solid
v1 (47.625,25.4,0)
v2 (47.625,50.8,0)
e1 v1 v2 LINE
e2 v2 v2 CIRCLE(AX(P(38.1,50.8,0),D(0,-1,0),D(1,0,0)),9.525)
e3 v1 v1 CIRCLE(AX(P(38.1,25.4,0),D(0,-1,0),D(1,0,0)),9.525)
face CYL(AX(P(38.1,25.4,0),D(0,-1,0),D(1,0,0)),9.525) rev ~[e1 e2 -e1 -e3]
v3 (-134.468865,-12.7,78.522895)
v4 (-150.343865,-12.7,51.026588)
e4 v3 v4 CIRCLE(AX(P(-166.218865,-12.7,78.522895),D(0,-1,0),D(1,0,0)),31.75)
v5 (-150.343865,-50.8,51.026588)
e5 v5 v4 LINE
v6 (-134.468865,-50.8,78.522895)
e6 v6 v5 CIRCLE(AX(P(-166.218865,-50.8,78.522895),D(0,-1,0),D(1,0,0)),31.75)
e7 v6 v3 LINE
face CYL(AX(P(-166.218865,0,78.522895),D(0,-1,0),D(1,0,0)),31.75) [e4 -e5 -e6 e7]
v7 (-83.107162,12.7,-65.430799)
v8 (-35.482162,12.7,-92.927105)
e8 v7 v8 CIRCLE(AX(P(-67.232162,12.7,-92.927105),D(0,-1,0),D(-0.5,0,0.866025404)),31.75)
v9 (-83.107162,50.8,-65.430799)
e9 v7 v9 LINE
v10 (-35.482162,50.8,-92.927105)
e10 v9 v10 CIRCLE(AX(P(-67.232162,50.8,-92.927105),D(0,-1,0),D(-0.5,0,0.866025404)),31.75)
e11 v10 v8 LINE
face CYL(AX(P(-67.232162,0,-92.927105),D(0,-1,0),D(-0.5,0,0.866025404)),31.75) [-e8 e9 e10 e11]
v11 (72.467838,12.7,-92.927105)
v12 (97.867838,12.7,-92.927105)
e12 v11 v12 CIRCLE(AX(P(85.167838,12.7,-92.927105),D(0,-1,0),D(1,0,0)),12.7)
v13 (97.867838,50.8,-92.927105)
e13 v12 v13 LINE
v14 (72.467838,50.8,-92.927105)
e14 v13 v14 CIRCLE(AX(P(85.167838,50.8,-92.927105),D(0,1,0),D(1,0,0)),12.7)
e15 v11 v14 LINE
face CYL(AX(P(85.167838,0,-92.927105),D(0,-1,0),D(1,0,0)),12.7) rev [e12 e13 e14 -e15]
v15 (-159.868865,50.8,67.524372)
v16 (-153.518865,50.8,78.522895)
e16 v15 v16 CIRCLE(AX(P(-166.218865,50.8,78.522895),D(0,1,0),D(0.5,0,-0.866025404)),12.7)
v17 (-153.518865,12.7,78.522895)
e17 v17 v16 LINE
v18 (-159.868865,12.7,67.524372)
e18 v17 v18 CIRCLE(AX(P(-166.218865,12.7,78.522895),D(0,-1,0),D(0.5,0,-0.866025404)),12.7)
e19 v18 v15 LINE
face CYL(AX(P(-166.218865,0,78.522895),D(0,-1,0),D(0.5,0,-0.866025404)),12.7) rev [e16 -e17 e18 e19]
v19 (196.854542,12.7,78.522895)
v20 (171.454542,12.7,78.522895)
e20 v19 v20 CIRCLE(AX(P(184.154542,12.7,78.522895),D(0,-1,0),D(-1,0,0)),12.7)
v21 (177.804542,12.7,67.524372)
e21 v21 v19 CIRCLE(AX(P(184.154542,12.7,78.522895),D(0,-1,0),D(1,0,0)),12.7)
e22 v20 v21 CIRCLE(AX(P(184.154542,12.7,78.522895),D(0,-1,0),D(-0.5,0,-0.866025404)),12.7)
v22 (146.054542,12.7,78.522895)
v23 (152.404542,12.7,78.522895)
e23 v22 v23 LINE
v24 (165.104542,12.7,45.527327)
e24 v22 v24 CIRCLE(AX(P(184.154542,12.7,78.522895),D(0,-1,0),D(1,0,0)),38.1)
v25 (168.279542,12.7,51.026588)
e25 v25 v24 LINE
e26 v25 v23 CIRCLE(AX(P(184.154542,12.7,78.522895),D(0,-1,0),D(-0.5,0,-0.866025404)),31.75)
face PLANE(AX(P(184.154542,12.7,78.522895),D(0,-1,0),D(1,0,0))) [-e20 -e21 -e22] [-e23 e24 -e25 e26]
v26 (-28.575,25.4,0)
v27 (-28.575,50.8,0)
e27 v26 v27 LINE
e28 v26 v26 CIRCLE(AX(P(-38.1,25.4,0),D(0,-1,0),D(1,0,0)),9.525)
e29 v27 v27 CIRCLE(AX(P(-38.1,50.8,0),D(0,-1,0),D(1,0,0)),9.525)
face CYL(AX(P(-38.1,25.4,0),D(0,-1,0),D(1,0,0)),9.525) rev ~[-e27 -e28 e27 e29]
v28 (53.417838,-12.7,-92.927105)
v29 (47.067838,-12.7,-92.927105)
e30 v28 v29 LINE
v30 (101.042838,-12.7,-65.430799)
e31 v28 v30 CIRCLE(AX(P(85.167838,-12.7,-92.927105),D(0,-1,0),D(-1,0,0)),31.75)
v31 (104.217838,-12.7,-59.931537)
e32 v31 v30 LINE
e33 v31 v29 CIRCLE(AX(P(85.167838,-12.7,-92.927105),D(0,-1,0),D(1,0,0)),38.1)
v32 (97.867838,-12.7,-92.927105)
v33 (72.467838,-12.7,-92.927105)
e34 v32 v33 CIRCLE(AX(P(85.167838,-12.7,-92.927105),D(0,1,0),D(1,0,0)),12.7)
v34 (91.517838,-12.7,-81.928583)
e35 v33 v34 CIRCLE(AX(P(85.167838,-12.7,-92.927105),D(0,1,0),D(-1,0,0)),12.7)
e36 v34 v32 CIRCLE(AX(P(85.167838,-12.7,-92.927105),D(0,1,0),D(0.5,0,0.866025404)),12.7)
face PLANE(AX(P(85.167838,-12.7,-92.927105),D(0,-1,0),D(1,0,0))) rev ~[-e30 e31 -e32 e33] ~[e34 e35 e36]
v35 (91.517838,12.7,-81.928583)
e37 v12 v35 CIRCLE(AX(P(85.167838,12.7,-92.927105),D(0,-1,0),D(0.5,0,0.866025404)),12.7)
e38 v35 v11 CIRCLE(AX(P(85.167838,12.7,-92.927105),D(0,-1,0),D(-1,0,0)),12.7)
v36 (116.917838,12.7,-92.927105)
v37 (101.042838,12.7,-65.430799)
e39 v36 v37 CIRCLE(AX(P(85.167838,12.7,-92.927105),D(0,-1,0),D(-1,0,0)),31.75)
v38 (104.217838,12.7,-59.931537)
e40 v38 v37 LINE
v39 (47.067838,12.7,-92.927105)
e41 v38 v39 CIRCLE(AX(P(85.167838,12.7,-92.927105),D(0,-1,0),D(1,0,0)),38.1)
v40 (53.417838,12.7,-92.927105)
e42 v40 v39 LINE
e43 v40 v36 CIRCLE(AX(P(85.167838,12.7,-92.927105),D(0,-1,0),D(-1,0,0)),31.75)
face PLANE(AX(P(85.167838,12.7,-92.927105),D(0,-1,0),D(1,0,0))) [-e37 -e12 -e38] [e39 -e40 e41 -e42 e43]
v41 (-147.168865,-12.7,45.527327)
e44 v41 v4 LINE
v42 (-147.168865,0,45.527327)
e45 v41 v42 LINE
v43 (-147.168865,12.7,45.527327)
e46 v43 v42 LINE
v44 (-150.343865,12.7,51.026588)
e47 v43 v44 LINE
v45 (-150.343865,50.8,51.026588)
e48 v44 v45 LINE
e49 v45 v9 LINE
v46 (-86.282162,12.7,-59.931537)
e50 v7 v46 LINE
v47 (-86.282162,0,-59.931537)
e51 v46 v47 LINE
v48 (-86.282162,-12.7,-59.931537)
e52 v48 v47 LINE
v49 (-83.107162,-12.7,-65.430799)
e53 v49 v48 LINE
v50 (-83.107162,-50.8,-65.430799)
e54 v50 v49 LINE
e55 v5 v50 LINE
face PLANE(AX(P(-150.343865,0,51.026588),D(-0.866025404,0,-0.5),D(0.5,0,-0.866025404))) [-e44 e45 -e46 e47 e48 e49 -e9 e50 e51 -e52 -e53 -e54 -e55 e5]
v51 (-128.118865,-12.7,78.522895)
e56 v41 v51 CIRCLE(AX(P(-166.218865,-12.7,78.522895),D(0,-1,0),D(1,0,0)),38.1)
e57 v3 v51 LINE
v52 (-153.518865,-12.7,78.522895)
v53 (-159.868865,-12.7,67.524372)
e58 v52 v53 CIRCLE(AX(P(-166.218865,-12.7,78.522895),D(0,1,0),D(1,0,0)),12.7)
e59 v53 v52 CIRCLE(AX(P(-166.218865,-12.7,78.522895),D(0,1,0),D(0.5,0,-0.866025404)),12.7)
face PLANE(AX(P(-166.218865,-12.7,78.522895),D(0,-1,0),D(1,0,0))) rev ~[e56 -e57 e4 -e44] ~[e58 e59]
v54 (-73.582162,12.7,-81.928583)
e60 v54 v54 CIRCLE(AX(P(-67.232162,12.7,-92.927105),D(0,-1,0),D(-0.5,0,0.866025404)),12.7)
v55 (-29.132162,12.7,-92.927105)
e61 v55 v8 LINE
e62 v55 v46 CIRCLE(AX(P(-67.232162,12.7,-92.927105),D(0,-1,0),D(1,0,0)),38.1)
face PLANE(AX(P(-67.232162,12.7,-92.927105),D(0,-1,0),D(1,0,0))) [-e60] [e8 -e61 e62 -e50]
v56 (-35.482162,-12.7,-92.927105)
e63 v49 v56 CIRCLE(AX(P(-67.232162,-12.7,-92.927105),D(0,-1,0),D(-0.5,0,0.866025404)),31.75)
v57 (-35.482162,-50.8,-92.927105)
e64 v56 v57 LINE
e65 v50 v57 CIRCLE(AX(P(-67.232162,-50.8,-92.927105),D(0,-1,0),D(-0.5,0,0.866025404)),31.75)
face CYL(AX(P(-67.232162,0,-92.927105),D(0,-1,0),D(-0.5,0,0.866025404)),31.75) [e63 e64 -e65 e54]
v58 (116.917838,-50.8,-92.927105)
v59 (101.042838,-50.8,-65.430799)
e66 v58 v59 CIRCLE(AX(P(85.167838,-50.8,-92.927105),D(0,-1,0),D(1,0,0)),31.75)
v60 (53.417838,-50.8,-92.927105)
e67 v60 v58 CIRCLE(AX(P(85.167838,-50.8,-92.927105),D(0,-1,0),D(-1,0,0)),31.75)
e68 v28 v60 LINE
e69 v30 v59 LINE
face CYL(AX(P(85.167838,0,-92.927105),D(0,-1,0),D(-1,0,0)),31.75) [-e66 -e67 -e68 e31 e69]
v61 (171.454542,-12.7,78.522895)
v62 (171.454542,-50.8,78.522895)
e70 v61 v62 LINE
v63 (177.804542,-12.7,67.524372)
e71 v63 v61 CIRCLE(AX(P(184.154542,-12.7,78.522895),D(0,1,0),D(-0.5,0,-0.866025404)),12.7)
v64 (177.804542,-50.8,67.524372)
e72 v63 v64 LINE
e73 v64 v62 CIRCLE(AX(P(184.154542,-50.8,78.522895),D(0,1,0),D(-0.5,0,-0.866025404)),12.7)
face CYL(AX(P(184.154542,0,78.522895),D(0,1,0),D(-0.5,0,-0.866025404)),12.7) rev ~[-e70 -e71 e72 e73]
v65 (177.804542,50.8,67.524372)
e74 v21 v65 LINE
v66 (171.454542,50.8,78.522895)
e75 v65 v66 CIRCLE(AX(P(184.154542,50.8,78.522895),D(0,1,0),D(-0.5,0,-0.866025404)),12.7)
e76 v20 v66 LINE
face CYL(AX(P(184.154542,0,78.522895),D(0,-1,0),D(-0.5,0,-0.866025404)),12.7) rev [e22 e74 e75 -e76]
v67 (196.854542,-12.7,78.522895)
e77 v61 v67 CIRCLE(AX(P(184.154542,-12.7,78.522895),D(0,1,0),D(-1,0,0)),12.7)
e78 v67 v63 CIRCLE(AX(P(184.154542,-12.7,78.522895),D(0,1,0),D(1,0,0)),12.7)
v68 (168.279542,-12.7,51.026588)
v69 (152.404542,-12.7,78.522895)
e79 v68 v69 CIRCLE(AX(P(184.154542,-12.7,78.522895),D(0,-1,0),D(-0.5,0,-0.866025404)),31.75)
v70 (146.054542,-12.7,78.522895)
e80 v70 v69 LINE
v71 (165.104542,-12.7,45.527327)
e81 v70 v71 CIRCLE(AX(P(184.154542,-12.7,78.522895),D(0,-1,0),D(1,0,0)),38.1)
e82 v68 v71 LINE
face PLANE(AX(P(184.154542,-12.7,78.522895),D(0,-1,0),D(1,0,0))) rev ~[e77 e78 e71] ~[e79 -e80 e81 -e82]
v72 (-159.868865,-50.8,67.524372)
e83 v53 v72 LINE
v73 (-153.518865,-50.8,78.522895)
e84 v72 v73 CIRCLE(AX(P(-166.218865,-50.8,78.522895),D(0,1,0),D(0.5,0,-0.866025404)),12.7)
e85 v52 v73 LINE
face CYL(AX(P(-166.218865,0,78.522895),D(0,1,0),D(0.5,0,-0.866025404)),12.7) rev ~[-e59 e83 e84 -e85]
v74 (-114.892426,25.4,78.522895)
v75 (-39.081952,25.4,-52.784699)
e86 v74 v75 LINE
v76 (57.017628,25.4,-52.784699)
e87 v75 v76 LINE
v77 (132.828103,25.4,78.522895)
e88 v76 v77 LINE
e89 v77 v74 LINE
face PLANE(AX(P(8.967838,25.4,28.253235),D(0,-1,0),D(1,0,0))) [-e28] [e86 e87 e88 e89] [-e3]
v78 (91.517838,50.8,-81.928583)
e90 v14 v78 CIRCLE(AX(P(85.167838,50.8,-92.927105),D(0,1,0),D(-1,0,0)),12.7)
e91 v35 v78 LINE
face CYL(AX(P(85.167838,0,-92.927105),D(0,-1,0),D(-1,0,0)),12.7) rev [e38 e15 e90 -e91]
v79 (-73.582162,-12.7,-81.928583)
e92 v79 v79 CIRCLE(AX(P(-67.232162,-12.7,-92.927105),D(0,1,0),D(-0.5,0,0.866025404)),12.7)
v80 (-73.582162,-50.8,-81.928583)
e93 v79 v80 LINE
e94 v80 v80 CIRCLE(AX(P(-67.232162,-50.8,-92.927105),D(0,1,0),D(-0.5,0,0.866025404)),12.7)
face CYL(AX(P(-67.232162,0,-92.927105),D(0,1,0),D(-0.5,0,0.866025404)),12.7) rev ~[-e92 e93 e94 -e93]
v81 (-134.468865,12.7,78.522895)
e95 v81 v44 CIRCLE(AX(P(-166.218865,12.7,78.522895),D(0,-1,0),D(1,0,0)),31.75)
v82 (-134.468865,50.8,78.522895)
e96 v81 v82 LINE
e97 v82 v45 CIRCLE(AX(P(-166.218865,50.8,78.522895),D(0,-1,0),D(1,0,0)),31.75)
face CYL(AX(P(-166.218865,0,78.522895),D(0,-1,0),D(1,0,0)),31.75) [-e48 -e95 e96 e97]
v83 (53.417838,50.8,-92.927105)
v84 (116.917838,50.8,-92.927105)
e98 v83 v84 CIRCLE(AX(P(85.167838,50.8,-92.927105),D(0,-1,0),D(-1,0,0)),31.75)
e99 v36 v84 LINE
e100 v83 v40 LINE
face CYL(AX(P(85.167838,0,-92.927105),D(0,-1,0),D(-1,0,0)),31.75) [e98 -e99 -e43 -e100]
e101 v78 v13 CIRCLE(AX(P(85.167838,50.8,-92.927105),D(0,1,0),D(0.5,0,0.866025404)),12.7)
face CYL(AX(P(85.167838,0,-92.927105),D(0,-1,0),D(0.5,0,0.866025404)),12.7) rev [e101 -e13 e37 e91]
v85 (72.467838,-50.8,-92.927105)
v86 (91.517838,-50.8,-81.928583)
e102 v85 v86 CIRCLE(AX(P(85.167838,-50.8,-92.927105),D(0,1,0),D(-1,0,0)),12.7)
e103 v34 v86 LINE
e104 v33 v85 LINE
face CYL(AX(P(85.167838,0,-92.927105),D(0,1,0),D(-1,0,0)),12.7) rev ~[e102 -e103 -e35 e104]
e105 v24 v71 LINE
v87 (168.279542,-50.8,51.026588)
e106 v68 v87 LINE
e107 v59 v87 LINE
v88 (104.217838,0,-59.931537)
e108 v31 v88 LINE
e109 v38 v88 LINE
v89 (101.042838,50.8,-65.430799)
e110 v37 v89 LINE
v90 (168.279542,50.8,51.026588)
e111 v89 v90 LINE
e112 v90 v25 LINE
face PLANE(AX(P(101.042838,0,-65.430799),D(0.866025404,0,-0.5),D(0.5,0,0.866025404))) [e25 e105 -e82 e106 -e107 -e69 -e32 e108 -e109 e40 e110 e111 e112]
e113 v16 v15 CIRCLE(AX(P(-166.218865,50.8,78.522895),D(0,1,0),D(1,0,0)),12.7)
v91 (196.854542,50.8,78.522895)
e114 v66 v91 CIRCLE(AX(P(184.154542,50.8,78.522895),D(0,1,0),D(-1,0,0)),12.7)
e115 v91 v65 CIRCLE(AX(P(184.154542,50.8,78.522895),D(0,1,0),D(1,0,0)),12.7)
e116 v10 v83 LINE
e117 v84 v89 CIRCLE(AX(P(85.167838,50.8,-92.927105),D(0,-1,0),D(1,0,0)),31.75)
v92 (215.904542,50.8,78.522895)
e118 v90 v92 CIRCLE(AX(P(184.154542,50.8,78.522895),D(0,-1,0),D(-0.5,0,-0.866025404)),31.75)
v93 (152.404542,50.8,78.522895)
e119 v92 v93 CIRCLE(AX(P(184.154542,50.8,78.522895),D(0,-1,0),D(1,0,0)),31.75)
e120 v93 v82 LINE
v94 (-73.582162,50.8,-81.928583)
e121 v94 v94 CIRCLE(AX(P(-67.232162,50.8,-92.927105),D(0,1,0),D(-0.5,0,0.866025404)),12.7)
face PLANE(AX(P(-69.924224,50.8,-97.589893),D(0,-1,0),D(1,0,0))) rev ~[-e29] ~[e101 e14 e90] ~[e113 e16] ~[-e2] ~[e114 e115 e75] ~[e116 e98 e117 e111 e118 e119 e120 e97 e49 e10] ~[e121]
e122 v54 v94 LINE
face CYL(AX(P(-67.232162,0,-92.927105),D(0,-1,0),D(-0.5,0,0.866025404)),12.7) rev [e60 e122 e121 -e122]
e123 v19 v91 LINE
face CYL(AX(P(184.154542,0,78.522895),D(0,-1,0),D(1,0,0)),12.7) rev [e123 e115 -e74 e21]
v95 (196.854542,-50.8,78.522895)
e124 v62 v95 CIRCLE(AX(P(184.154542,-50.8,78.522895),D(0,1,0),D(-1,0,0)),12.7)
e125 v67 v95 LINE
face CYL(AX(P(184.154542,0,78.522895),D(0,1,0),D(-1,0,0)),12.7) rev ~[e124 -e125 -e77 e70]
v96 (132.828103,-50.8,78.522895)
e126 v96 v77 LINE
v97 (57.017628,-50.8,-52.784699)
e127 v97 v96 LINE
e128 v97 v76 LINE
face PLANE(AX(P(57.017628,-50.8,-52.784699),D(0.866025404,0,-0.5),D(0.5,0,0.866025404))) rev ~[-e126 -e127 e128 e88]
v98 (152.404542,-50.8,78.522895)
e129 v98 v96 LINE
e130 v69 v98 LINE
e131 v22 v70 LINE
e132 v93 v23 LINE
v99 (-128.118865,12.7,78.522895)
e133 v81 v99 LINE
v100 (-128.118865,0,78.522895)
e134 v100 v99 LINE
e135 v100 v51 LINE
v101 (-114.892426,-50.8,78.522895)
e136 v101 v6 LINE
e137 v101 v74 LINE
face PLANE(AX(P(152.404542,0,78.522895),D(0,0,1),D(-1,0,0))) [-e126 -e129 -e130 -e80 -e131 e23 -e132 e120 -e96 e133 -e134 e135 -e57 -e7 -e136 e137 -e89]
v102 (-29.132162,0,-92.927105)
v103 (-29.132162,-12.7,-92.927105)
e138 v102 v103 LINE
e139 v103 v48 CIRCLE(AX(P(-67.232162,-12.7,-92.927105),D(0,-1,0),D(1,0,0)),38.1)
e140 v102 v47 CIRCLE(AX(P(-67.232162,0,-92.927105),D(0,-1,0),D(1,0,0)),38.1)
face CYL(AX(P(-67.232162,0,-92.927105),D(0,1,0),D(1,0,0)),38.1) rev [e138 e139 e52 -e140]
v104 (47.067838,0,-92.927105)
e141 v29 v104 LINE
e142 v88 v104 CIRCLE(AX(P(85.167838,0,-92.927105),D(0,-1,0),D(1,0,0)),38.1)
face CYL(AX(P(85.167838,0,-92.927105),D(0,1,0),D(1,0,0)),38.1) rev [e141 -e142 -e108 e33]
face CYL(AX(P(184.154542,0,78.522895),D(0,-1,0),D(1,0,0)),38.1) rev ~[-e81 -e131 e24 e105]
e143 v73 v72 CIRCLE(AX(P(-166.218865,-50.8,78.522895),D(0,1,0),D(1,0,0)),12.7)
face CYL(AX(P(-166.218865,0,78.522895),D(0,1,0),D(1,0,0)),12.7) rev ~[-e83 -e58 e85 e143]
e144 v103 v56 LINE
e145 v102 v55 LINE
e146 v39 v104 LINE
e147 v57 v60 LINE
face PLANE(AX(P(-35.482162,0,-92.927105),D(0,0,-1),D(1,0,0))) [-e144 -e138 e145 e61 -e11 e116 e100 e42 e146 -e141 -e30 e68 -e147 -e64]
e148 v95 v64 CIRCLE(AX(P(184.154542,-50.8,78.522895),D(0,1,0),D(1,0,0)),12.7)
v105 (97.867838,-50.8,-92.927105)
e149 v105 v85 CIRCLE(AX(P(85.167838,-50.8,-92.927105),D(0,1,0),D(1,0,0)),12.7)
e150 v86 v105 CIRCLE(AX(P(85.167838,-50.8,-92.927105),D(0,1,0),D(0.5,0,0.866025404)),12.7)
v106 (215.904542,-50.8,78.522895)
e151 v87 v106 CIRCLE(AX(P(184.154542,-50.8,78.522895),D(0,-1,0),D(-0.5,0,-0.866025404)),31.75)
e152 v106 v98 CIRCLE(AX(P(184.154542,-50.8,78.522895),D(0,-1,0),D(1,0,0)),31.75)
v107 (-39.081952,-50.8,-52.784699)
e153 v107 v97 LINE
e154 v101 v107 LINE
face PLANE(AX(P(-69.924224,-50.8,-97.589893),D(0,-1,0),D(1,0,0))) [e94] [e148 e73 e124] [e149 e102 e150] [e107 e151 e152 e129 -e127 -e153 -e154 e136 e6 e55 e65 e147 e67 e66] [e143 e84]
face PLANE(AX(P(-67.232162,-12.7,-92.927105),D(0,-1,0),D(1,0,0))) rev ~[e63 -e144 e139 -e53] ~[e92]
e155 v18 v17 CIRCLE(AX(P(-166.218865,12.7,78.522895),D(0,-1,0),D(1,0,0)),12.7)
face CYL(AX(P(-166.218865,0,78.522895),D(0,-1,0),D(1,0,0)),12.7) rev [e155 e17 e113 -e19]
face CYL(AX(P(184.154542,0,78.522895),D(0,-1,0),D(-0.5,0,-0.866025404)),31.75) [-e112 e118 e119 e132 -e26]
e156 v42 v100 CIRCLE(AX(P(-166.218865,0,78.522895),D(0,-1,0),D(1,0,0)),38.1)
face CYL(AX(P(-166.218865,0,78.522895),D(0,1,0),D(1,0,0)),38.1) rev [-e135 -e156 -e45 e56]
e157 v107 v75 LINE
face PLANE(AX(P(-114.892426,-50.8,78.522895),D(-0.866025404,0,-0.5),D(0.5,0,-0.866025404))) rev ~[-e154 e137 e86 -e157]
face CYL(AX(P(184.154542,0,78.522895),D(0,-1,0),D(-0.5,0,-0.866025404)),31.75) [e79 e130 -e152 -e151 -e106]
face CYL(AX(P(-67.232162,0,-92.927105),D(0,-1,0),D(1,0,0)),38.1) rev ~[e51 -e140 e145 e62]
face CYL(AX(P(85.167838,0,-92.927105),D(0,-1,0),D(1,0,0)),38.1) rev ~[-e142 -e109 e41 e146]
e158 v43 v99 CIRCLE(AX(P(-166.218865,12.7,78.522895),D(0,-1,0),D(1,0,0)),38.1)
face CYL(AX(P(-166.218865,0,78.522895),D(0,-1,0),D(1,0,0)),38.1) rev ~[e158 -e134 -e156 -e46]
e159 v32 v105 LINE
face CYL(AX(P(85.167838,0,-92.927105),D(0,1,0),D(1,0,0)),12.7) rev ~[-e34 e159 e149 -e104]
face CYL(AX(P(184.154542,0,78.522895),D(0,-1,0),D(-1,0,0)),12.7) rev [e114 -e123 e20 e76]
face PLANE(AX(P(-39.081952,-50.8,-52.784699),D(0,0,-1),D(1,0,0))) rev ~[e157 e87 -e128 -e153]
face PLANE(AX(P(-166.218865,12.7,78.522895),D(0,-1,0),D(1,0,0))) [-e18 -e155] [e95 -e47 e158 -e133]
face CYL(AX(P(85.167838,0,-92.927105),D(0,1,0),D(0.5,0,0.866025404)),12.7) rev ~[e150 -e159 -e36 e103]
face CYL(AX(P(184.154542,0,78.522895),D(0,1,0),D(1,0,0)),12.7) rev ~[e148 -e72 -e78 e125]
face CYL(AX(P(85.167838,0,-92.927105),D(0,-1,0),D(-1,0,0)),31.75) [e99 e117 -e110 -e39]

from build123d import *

# Parameters (mm, degrees)
F1_DEPTH = 50.8
F3_DEPTH = 76.2
F4_R     = 38.1
F5_DEPTH = 12.7
F6_R     = 9.525
F7_DEPTH = 25.401


with BuildPart() as f1:
    # F0 (on Front) → F1 (new body, symmetric)
    with BuildSketch(Plane.XZ):
        with BuildLine():
            ThreePointArc((-83.1071616711, -65.430798607), (-83.1071616711, -120.4234117473), (-35.4821616711, -92.9271051772))
            Line((-35.4821616711, -92.9271051772), (-54.5321616711, -92.9271051772))
            ThreePointArc((-54.5321616711, -92.9271051772), (-73.5821616711, -103.9256278052), (-73.5821616711, -81.9285825491))
            Line((-73.5821616711, -81.9285825491), (-83.1071616711, -65.430798607))
        make_face()
        with BuildLine():
            ThreePointArc((-83.1071616711, -65.430798607), (-51.3571616711, -65.430798607), (-35.4821616711, -92.9271051772))
            Line((-35.4821616711, -92.9271051772), (53.4178383289, -92.9271051772))
            ThreePointArc((53.4178383289, -92.9271051772), (69.2928383289, -65.430798607), (101.0428383289, -65.430798607))
            Line((101.0428383289, -65.430798607), (168.2795419814, 51.0265882527))
            ThreePointArc((168.2795419814, 51.0265882527), (156.6582354113, 62.6478948228), (152.4045419814, 78.5228948228))
            Line((152.4045419814, 78.5228948228), (-134.4688653237, 78.5228948228))
            ThreePointArc((-134.4688653237, 78.5228948228), (-138.7225587535, 62.6478948228), (-150.3438653237, 51.0265882527))
            Line((-150.3438653237, 51.0265882527), (-83.1071616711, -65.430798607))
        make_face()
        with BuildLine():
            Line((-54.5321616711, -92.9271051772), (-35.4821616711, -92.9271051772))
            ThreePointArc((-35.4821616711, -92.9271051772), (-51.3571616711, -65.430798607), (-83.1071616711, -65.430798607))
            Line((-83.1071616711, -65.430798607), (-73.5821616711, -81.9285825491))
            ThreePointArc((-73.5821616711, -81.9285825491), (-60.8821616711, -81.9285825491), (-54.5321616711, -92.9271051772))
        make_face()
        with BuildLine():
            ThreePointArc((101.0428383289, -65.430798607), (69.2928383289, -65.430798607), (53.4178383289, -92.9271051772))
            Line((53.4178383289, -92.9271051772), (72.4678383289, -92.9271051772))
            ThreePointArc((72.4678383289, -92.9271051772), (78.8178383289, -81.9285825491), (91.5178383289, -81.9285825491))
            Line((91.5178383289, -81.9285825491), (101.0428383289, -65.430798607))
        make_face()
        with BuildLine():
            Line((72.4678383289, -92.9271051772), (53.4178383289, -92.9271051772))
            ThreePointArc((53.4178383289, -92.9271051772), (85.1678383289, -124.6771051772), (116.9178383289, -92.9271051772))
            ThreePointArc((116.9178383289, -92.9271051772), (112.664144899, -77.0521051772), (101.0428383289, -65.430798607))
            Line((101.0428383289, -65.430798607), (91.5178383289, -81.9285825491))
            ThreePointArc((91.5178383289, -81.9285825491), (96.1663609569, -86.5771051772), (97.8678383289, -92.9271051772))
            ThreePointArc((97.8678383289, -92.9271051772), (85.1678383289, -105.6271051772), (72.4678383289, -92.9271051772))
        make_face()
        with BuildLine():
            ThreePointArc((-134.4688653237, 78.5228948228), (-193.7151718938, 94.3978948228), (-150.3438653237, 51.0265882527))
            Line((-150.3438653237, 51.0265882527), (-159.8688653237, 67.5243721948))
            ThreePointArc((-159.8688653237, 67.5243721948), (-177.2173879518, 84.8728948228), (-153.5188653237, 78.5228948228))
            Line((-153.5188653237, 78.5228948228), (-134.4688653237, 78.5228948228))
        make_face()
        with BuildLine():
            Line((-159.8688653237, 67.5243721948), (-150.3438653237, 51.0265882527))
            ThreePointArc((-150.3438653237, 51.0265882527), (-138.7225587535, 62.6478948228), (-134.4688653237, 78.5228948228))
            Line((-134.4688653237, 78.5228948228), (-153.5188653237, 78.5228948228))
            ThreePointArc((-153.5188653237, 78.5228948228), (-155.2203426956, 72.1728948228), (-159.8688653237, 67.5243721948))
        make_face()
        with BuildLine():
            ThreePointArc((152.4045419814, 78.5228948228), (156.6582354113, 62.6478948228), (168.2795419814, 51.0265882527))
            Line((168.2795419814, 51.0265882527), (177.8045419814, 67.5243721948))
            ThreePointArc((177.8045419814, 67.5243721948), (173.1560193534, 72.1728948228), (171.4545419814, 78.5228948228))
            Line((171.4545419814, 78.5228948228), (152.4045419814, 78.5228948228))
        make_face()
        with BuildLine():
            Line((177.8045419814, 67.5243721948), (168.2795419814, 51.0265882527))
            ThreePointArc((168.2795419814, 51.0265882527), (200.0295419814, 51.0265882527), (215.9045419814, 78.5228948228))
            ThreePointArc((215.9045419814, 78.5228948228), (184.1545419814, 110.2728948228), (152.4045419814, 78.5228948228))
            Line((152.4045419814, 78.5228948228), (171.4545419814, 78.5228948228))
            ThreePointArc((171.4545419814, 78.5228948228), (184.1545419814, 91.2228948228), (196.8545419814, 78.5228948228))
            ThreePointArc((196.8545419814, 78.5228948228), (190.5045419814, 67.5243721948), (177.8045419814, 67.5243721948))
        make_face()
    extrude(amount=F1_DEPTH, both=True)

    # F2 (on face) → F3 (cut)
    with BuildSketch(Plane.XZ.offset(50.8)):
        Polygon((132.8281030505, 78.5228948228), (-114.8924263927, 78.5228948228), (-39.0819515524, -52.7846993466), (57.0176282101, -52.7846993466), align=None)
    extrude(amount=-F3_DEPTH, mode=Mode.SUBTRACT)

    # F4 (on Front) → F5 (cut, symmetric)
    with BuildSketch(Plane.XZ):
        with Locations((-166.2188653237, 78.5228948228)):
            Circle(F4_R)
        with Locations((-67.2321616711, -92.9271051772)):
            Circle(F4_R)
        with Locations((85.1678383289, -92.9271051772)):
            Circle(F4_R)
        with Locations((184.1545419814, 78.5228948228)):
            Circle(F4_R)
    extrude(amount=F5_DEPTH, both=True, mode=Mode.SUBTRACT)

    # F6 (on face) → F7 (cut, through all)
    with BuildSketch(Plane.XZ.offset(-25.4)):
        with Locations((-38.1, 0)):
            Circle(F6_R)
        with Locations((38.1, 0)):
            Circle(F6_R)
    extrude(amount=-F7_DEPTH, mode=Mode.SUBTRACT)


solid = f1.part
